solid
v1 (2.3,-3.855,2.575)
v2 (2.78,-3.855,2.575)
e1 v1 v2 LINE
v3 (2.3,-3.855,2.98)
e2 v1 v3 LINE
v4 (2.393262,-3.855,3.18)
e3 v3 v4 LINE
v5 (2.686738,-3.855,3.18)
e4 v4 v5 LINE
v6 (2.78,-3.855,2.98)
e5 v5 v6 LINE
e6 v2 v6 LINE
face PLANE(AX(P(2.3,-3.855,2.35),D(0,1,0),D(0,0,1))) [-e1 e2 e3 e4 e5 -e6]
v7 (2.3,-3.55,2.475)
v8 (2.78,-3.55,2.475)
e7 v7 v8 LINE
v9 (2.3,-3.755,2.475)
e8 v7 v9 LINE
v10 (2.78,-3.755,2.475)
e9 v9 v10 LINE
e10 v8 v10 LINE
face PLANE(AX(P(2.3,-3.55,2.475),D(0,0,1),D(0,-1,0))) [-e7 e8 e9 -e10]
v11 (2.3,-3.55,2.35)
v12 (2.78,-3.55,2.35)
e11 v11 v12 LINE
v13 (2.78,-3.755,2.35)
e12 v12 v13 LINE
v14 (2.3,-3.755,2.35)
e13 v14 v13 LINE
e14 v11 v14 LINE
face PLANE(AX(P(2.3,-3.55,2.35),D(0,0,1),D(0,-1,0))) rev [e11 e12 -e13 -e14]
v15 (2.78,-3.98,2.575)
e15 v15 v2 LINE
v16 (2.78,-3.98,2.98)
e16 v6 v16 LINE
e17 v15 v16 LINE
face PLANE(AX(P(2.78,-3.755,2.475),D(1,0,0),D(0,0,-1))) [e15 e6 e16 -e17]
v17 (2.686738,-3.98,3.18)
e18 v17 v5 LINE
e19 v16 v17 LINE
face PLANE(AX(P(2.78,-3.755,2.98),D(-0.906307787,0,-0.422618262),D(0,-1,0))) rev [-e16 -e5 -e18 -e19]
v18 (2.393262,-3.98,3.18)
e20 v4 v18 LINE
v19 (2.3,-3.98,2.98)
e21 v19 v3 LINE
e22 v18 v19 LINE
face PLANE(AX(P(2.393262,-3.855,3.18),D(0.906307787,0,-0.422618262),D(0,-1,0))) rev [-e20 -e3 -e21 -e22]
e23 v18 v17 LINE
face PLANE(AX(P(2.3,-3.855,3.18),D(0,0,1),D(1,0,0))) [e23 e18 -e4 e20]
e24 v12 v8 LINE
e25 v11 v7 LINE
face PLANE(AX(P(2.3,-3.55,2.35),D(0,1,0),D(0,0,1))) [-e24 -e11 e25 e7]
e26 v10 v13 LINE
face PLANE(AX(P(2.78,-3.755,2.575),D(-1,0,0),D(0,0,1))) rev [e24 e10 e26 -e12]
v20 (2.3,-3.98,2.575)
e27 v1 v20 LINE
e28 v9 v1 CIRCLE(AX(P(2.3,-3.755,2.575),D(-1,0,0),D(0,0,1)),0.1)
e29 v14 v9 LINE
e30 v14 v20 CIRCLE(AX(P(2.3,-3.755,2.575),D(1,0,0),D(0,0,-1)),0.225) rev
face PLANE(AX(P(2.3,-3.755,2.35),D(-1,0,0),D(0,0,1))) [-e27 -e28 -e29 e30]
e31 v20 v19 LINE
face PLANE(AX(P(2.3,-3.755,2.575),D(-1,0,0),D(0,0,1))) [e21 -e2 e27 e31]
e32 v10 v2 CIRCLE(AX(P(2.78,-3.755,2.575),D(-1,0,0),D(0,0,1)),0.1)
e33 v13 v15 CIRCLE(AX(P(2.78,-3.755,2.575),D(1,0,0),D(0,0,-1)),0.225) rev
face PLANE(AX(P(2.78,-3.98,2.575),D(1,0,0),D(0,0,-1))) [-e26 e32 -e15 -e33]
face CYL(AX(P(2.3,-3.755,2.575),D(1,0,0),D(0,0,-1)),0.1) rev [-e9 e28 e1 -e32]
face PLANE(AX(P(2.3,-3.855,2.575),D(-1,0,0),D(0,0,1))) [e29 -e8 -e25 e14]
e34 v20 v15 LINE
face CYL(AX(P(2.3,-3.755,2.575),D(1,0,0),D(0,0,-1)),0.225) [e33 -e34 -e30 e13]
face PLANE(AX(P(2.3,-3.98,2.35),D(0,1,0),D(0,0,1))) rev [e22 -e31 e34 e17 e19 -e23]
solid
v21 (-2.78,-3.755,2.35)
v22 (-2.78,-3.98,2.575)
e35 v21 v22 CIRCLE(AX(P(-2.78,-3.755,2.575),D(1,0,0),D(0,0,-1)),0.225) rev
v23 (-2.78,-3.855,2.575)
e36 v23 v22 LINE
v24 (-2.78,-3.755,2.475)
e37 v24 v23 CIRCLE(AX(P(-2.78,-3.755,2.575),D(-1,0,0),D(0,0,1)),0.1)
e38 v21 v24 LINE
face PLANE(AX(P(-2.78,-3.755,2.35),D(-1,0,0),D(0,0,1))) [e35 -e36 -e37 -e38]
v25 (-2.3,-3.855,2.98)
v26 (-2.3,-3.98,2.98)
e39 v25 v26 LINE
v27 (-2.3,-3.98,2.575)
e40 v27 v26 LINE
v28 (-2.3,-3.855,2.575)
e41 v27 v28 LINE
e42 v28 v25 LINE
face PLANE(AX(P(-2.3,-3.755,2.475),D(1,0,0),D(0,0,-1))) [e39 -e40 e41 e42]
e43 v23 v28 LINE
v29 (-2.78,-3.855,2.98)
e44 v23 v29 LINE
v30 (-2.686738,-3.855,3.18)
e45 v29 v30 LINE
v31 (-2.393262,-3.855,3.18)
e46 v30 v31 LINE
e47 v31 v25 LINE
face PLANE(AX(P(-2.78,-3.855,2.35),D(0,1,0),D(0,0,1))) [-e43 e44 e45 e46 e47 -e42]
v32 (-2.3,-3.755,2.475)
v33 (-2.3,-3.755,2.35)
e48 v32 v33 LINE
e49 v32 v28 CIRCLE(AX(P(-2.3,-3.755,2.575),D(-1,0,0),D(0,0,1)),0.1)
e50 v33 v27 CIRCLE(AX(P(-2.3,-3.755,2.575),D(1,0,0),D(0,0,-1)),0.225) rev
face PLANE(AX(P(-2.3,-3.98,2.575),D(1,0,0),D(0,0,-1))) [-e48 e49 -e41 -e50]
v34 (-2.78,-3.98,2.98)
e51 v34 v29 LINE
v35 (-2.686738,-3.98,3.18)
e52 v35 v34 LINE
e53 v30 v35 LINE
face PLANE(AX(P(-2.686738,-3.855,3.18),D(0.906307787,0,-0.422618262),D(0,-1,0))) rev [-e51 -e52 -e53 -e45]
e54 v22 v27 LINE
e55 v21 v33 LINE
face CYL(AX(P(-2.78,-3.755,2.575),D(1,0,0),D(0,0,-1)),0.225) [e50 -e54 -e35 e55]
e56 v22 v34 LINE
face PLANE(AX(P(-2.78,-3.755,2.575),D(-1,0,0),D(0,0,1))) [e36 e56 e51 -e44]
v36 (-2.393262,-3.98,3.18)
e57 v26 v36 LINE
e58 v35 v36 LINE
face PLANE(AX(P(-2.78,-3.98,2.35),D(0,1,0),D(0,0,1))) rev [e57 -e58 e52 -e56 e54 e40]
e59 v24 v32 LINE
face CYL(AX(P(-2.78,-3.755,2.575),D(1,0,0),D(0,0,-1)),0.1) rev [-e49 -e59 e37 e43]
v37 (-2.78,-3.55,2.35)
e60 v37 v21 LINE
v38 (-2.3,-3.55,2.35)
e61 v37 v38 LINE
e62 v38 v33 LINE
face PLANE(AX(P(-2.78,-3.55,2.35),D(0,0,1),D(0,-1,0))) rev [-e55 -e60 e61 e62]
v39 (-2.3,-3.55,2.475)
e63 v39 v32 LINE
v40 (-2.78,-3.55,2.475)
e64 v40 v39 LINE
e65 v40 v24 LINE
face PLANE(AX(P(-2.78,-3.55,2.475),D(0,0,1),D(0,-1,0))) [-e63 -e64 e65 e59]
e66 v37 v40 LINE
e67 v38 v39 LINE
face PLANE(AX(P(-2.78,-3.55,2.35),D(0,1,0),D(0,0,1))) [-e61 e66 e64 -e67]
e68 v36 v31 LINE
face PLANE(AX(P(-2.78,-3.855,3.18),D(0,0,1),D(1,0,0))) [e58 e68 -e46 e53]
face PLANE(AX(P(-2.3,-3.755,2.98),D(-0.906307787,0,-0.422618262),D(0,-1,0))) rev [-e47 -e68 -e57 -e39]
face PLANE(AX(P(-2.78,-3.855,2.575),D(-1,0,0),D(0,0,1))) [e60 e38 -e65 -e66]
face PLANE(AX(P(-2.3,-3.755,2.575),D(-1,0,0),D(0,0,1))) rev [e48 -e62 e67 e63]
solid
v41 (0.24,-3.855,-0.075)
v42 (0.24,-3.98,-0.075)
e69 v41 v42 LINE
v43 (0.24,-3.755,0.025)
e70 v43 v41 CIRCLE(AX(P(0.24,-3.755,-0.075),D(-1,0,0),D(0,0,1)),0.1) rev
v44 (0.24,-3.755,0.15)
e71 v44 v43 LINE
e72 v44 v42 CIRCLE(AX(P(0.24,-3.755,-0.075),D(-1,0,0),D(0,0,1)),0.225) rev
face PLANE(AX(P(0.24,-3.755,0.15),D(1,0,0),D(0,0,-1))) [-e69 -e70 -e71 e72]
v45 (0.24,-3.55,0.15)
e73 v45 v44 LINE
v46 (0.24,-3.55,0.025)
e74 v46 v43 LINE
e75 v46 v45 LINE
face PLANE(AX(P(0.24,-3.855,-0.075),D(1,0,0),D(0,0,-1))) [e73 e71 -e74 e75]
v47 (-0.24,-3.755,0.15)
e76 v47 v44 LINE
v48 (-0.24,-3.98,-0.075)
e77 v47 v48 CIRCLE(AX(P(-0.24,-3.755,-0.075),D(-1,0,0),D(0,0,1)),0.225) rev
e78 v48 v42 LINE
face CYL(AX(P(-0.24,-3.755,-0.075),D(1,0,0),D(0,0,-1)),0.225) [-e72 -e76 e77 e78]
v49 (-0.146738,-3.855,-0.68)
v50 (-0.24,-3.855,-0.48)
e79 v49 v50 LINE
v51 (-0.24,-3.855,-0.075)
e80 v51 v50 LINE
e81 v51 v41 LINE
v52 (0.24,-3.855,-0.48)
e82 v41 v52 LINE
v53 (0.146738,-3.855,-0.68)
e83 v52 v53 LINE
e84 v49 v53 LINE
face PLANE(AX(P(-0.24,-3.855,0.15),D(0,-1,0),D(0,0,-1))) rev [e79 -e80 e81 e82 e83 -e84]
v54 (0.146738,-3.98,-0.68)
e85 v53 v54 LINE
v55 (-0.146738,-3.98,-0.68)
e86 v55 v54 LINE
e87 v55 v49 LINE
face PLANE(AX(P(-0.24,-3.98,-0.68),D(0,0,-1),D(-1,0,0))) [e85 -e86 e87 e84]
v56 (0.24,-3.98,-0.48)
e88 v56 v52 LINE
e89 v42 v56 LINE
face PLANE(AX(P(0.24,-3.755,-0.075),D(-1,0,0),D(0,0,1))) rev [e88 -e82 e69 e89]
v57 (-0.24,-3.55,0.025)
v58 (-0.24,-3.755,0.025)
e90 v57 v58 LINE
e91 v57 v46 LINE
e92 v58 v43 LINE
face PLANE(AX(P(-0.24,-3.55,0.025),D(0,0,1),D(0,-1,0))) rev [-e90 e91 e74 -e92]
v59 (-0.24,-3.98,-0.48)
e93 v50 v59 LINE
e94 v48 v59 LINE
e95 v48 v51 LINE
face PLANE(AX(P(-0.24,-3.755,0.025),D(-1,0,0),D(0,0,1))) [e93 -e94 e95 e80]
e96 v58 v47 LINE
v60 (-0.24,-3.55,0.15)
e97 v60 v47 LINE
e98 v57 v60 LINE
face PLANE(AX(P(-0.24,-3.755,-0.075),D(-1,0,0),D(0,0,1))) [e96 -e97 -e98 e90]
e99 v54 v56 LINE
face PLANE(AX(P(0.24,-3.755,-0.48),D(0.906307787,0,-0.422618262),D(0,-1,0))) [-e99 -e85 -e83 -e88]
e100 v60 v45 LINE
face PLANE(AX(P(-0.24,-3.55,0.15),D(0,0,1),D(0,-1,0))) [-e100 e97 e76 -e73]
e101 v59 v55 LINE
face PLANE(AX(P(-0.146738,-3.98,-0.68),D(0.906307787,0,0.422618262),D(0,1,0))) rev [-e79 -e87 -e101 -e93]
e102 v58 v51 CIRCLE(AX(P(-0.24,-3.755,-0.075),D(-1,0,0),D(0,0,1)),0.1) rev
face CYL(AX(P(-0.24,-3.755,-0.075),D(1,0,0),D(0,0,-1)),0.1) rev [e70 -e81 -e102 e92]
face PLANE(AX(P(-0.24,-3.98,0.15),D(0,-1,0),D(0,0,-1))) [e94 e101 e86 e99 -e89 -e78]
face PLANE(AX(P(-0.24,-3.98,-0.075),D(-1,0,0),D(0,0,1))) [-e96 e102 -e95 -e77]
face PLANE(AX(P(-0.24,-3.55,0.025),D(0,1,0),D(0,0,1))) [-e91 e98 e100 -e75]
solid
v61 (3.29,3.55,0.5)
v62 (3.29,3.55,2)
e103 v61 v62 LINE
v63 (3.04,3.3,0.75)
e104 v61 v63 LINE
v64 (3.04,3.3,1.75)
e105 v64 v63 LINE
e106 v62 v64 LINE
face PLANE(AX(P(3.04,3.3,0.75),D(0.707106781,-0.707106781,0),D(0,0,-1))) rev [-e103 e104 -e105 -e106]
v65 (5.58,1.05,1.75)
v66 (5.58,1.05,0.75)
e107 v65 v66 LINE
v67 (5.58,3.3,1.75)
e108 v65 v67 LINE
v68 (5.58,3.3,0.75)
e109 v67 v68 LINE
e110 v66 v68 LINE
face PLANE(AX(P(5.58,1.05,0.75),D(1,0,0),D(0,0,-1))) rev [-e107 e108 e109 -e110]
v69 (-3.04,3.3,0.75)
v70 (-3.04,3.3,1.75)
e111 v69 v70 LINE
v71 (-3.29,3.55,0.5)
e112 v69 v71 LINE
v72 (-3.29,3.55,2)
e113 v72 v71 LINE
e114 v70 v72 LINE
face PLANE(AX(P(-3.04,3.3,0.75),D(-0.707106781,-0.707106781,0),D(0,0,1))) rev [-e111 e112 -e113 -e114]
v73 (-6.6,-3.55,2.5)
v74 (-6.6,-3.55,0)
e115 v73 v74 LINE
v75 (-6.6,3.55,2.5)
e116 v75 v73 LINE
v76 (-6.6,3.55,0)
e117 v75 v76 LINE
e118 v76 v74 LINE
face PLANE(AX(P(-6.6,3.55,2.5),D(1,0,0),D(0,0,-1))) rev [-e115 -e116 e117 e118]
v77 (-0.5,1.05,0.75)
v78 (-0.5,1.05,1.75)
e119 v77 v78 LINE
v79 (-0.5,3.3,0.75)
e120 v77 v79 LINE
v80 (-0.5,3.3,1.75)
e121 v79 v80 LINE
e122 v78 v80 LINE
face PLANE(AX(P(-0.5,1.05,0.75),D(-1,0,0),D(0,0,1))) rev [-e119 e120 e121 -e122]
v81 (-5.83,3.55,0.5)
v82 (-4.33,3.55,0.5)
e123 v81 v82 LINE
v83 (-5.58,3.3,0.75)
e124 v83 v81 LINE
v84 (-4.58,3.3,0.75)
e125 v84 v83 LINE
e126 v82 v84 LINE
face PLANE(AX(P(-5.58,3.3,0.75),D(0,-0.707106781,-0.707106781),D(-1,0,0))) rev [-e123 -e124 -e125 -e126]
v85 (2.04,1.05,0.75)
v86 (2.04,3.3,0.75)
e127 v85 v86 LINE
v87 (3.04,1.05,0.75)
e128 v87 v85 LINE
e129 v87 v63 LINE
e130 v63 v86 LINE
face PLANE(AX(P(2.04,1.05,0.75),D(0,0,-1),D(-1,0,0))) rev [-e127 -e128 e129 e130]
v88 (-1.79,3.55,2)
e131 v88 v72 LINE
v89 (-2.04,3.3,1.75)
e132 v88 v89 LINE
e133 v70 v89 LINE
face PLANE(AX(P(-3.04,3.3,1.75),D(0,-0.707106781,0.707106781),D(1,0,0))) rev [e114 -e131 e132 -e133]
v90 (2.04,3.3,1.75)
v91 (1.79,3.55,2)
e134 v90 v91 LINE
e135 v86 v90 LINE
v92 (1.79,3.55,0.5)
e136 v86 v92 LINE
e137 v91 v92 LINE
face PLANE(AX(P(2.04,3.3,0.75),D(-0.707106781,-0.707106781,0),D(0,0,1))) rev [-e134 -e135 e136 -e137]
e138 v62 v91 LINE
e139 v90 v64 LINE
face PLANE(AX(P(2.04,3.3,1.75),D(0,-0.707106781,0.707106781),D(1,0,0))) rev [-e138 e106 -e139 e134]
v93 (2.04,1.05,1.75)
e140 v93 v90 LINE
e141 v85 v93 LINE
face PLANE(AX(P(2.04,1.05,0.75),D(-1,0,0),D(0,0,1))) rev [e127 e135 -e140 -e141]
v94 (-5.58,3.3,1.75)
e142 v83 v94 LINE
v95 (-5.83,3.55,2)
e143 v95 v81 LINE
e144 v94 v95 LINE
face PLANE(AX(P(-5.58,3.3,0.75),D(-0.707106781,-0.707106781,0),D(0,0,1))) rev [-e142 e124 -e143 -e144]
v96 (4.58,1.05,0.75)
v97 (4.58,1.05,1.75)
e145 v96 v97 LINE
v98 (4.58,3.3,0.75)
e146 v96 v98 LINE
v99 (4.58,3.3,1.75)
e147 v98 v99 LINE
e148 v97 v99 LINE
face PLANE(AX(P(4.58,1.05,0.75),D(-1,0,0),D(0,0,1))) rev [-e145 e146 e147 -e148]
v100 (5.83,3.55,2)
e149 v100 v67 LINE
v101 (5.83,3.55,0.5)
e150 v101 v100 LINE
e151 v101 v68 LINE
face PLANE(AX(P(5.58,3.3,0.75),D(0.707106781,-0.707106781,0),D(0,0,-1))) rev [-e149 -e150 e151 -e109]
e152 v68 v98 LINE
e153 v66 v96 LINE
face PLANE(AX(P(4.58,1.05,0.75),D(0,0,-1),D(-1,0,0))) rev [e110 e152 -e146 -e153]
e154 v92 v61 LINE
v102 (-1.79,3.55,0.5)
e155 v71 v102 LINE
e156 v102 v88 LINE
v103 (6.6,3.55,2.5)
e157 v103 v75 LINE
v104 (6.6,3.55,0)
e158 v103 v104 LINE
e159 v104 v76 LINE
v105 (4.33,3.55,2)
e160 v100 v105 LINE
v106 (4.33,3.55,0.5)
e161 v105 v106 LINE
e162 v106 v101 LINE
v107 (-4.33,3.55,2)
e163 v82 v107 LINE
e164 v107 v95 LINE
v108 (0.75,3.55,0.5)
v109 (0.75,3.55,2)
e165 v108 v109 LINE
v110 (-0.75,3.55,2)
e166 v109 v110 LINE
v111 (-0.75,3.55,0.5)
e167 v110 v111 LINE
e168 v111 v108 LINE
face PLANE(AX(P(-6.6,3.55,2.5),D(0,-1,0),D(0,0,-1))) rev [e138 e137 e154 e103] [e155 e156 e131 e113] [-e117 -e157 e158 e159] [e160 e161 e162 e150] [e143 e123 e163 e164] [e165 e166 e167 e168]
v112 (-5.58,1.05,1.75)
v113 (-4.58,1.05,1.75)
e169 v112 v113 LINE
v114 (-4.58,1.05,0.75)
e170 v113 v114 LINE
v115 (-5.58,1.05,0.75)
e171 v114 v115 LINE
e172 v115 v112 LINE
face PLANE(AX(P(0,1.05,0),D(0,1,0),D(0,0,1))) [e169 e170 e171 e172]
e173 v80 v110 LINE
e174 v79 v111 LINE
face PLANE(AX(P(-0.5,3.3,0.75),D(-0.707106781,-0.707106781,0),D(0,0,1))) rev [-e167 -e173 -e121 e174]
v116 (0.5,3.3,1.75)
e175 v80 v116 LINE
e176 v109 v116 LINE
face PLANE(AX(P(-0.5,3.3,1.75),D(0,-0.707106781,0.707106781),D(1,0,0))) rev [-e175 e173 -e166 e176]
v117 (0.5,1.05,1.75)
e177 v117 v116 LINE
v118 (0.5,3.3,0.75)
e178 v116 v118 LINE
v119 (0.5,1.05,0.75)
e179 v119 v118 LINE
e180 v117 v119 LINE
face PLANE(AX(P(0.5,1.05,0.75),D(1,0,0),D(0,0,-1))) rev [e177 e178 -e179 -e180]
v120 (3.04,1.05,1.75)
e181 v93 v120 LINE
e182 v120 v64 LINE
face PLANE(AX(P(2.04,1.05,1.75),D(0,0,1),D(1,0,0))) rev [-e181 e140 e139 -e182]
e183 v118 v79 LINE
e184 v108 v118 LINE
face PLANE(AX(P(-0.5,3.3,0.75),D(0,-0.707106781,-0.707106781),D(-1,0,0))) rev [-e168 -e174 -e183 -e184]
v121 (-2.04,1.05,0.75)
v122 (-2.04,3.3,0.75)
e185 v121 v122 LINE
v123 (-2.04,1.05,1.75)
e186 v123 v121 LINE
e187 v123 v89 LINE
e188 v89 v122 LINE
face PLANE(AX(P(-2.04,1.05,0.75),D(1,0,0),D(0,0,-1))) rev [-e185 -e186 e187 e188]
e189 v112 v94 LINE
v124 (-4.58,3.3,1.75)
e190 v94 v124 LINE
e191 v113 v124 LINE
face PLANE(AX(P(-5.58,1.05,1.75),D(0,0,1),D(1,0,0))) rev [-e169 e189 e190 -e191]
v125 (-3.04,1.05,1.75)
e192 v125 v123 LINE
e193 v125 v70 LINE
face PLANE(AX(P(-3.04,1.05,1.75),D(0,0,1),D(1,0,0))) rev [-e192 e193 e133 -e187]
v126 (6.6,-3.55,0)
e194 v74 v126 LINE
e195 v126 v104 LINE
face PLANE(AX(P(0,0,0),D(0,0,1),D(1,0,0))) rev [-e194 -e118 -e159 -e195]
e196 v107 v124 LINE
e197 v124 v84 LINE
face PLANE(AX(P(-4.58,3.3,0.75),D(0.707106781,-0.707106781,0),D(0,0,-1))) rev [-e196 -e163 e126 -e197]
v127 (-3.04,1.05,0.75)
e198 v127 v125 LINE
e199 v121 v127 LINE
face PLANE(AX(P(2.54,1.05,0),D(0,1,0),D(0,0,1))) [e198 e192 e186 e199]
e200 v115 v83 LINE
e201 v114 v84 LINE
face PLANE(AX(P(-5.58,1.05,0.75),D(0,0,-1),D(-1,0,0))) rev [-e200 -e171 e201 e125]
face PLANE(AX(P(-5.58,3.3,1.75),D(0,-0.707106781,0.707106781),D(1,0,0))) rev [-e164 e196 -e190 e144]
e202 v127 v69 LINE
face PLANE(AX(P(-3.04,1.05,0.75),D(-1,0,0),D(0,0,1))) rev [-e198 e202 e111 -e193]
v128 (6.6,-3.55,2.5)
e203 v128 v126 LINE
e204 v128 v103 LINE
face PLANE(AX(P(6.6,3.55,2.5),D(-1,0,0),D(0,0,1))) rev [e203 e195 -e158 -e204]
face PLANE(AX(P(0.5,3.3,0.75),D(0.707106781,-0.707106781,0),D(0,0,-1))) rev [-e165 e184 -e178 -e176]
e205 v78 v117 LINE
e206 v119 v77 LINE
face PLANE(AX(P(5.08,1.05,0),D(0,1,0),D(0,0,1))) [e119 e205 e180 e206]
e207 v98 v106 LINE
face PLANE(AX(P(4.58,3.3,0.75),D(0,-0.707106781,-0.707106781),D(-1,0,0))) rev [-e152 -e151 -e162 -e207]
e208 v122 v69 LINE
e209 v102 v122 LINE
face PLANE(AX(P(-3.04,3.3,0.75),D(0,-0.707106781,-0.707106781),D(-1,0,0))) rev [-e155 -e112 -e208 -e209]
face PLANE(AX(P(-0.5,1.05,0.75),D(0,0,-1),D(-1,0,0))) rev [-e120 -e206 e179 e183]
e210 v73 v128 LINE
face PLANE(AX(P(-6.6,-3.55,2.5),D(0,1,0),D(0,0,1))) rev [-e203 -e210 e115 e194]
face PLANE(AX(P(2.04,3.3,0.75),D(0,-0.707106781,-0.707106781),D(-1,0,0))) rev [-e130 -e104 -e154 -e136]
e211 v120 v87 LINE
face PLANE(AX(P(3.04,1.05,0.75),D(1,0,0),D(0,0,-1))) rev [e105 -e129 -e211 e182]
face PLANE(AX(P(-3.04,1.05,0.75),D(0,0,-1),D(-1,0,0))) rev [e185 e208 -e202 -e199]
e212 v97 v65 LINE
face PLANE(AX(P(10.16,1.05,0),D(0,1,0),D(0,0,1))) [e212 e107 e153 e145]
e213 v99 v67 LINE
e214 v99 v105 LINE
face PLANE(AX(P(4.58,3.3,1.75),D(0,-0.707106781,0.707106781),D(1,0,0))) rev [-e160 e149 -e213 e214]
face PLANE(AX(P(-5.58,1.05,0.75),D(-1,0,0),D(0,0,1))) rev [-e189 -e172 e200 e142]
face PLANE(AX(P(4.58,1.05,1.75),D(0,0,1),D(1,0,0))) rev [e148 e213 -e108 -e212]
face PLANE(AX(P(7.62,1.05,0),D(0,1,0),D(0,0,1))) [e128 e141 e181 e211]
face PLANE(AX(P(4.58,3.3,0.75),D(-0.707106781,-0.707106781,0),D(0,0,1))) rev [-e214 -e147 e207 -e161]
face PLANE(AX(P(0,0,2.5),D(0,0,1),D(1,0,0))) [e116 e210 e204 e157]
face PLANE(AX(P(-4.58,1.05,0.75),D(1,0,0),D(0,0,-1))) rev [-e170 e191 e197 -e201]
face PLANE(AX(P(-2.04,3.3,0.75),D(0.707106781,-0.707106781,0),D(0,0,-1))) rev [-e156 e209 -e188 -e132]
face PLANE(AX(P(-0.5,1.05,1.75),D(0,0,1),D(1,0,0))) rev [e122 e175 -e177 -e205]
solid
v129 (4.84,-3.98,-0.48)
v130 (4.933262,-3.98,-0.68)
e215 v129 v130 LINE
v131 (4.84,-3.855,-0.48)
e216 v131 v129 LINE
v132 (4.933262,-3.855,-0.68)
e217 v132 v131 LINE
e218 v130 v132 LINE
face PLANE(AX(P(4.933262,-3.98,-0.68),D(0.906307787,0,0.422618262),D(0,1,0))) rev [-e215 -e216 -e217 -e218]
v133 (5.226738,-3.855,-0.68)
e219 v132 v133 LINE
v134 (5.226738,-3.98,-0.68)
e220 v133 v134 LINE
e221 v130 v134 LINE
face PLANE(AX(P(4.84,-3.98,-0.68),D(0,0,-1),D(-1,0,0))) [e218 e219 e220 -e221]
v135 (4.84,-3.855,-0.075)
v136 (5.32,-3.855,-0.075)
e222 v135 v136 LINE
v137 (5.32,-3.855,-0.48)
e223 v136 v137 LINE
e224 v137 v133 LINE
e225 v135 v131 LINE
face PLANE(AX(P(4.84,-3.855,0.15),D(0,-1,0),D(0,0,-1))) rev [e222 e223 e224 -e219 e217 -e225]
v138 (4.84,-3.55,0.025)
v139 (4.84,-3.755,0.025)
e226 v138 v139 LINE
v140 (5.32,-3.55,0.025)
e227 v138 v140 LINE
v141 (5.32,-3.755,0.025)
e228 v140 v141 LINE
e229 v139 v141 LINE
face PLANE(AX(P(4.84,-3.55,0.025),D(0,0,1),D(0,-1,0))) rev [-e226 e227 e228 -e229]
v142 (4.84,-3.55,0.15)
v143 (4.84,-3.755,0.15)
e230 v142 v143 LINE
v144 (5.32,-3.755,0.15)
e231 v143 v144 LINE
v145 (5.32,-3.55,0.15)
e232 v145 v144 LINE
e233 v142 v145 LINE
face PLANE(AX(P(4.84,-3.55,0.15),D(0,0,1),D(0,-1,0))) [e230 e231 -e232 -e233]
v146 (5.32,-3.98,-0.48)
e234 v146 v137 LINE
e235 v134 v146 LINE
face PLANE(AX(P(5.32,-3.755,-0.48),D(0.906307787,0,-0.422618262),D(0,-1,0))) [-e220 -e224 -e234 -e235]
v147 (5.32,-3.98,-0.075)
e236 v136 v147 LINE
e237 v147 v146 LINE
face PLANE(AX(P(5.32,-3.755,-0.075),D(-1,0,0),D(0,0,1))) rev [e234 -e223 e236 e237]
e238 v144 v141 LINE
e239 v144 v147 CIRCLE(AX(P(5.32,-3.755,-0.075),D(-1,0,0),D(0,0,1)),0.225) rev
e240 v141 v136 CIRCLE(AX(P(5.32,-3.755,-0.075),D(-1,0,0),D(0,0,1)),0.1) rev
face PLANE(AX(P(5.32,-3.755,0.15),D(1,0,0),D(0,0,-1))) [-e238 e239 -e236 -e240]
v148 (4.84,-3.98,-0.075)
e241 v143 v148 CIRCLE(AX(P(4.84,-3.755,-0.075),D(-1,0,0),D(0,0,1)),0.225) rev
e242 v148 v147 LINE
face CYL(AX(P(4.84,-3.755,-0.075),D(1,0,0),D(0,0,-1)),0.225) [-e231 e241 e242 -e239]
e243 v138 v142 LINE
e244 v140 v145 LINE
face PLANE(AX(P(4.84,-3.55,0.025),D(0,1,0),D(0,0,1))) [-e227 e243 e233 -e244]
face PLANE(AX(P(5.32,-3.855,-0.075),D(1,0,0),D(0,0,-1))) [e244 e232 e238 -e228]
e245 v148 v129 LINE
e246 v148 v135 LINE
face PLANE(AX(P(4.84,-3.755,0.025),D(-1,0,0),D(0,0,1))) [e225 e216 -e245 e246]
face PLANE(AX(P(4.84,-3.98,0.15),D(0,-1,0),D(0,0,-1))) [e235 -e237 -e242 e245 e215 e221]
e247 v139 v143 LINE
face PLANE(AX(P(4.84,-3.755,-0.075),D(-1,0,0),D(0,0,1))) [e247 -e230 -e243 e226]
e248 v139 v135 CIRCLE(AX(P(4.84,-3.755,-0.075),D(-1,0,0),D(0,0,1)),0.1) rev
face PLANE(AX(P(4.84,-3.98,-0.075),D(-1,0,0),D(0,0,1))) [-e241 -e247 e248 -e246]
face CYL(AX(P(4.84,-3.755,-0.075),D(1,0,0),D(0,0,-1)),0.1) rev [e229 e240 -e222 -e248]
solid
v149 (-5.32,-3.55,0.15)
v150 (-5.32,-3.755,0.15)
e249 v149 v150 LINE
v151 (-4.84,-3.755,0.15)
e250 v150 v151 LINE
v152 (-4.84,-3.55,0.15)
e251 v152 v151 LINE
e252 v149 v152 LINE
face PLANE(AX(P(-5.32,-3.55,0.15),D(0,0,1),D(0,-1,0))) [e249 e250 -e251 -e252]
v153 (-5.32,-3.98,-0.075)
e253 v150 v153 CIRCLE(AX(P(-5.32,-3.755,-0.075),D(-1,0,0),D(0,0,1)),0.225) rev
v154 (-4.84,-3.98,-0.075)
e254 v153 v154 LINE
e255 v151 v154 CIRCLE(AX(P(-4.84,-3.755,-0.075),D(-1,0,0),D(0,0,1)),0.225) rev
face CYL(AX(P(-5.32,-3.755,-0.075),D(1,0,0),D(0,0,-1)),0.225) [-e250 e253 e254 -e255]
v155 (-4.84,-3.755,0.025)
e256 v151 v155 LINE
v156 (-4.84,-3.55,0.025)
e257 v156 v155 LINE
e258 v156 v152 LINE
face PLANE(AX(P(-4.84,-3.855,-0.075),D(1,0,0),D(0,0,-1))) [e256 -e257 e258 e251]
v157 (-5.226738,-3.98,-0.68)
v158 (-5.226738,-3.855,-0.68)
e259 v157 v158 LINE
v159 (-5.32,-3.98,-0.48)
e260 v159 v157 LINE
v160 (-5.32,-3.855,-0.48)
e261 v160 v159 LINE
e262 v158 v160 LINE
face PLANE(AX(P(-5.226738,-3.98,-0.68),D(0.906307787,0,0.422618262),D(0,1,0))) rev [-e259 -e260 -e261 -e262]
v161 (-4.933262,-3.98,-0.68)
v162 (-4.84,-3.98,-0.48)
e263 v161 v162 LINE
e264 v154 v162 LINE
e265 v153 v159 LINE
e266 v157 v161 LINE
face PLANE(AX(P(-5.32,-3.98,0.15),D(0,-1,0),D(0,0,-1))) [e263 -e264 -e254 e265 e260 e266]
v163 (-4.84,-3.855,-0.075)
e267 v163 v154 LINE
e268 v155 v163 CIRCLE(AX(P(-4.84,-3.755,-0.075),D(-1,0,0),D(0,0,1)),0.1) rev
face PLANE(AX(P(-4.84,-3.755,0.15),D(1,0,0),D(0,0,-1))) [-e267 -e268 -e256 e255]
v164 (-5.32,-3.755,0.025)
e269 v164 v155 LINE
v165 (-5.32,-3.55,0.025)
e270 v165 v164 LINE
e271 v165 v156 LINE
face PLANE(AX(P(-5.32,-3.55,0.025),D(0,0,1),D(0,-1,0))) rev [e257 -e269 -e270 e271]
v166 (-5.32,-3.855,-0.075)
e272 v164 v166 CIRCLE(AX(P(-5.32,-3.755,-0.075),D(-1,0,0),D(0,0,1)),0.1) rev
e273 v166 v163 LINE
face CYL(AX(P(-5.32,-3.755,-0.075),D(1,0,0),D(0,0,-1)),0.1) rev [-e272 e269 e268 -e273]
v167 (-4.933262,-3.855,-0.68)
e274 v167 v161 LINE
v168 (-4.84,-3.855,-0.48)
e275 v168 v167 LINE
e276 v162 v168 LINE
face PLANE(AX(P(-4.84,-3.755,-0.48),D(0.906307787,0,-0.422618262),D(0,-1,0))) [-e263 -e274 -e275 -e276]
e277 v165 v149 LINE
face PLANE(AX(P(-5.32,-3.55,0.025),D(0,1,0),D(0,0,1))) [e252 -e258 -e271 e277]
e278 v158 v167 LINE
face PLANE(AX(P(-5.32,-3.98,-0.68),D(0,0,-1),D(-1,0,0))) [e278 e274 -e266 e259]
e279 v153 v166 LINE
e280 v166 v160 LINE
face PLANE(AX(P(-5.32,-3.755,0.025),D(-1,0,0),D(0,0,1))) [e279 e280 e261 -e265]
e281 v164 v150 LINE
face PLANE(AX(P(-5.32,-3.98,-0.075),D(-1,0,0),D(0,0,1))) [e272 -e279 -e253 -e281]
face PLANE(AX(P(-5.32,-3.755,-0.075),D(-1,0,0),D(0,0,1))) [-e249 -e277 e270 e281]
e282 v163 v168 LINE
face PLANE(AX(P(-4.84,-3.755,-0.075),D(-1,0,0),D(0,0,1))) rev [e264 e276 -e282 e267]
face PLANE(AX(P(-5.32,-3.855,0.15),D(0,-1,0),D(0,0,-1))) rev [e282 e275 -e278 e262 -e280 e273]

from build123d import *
from OCP.BRepFilletAPI import BRepFilletAPI_MakeChamfer

# Parameters (mm, degrees)
SKETCH1_W                  = 13.2
SKETCH1_H                  = 7.1
BOSS_EXTRUDE1_DEPTH        = 2.5
SKETCH2_W                  = 1
SKETCH2_H                  = 1
CUT_EXTRUDE1_DEPTH         = 2.5
CHAMFER1_SIZE              = 0.25
LPATTERN6_COUNT            = 5
LPATTERN6_PITCH            = 2.54
CHAMFER1_OF_LPATTERN6_SIZE = 0.25
BASE_FLANGE2_DEPTH         = 0.24
BASE_FLANGE2_DEPTH_BACK    = 0.24
BASE_FLANGE3_DEPTH         = 0.24
BASE_FLANGE3_DEPTH_BACK    = 0.24
CHAMFER3_SIZE              = 0.2
CHAMFER3_SIZE2             = 0.093261532
CHAMFER4_SIZE              = 0.2
CHAMFER4_SIZE2             = 0.093261532
LPATTERN4_COUNT            = 3
LPATTERN4_PITCH            = 5.08
LPATTERN3_COUNT            = 2
LPATTERN3_PITCH            = 5.08


# Sheet-metal steps are written as plain solids
with BuildPart() as part:
    # Sketch1 → Boss-Extrude1 (new body)
    with BuildSketch(Plane.XY):
        Rectangle(SKETCH1_W, SKETCH1_H)
    extrude(amount=BOSS_EXTRUDE1_DEPTH)

    # Sketch2 → Cut-Extrude1 (cut)
    with BuildSketch(Plane(origin=(0, 3.55, 0), x_dir=(1, 0, 0), z_dir=(0, 1, 0))):
        with Locations((-5.08, -1.25)):
            Rectangle(SKETCH2_W, SKETCH2_H)
    cut_extrude1 = extrude(amount=-CUT_EXTRUDE1_DEPTH, mode=Mode.SUBTRACT)

    # Chamfer1
    chamfer1_edges = [part.edges().sort_by_distance(p)[0] for p in [
        (-4.58, 3.55, 1.25),
        (-5.08, 3.55, 0.75),
        (-5.58, 3.55, 1.25),
        (-5.08, 3.55, 1.75),
    ]]
    chamfer(chamfer1_edges, length=CHAMFER1_SIZE)

    # LPattern6: Cut-Extrude1 ×5
    with Locations(*[(i * LPATTERN6_PITCH, 0, 0) for i in range(1, LPATTERN6_COUNT)]):
        add(cut_extrude1, mode=Mode.SUBTRACT)

    # Chamfer1 of LPattern6
    chamfer1_of_lpattern6_edges = [part.edges().sort_by_distance(p)[0] for p in [
        (-2.04, 3.55, 1.25),
        (-2.54, 3.55, 0.75),
        (-3.04, 3.55, 1.25),
        (-2.54, 3.55, 1.75),
        (0.5, 3.55, 1.25),
        (0, 3.55, 0.75),
        (-0.5, 3.55, 1.25),
        (0, 3.55, 1.75),
        (3.04, 3.55, 1.25),
        (2.54, 3.55, 0.75),
        (2.04, 3.55, 1.25),
        (2.54, 3.55, 1.75),
        (5.58, 3.55, 1.25),
        (5.08, 3.55, 0.75),
        (4.58, 3.55, 1.25),
        (5.08, 3.55, 1.75),
    ]]
    chamfer(chamfer1_of_lpattern6_edges, length=CHAMFER1_OF_LPATTERN6_SIZE)


with BuildPart() as body_2:
    # Sketch5 → Base-Flange2 (new, two sides: drawn at the far end of the back side and taken through both)
    with BuildSketch(Plane.ZY.offset(5.08).offset(-BASE_FLANGE2_DEPTH_BACK)):
        with BuildLine():
            Line((0.15, -3.55), (0.15, -3.755))
            ThreePointArc((0.15, -3.755), (0.084099026, -3.914099026), (-0.075, -3.98))
            Line((-0.075, -3.98), (-0.68, -3.98))
            Line((-0.68, -3.98), (-0.68, -3.855))
            Line((-0.68, -3.855), (-0.075, -3.855))
            ThreePointArc((-0.075, -3.855), (-0.004289322, -3.825710678), (0.025, -3.755))
            Line((0.025, -3.755), (0.025, -3.55))
            Line((0.025, -3.55), (0.15, -3.55))
        make_face()
    extrude(amount=BASE_FLANGE2_DEPTH + BASE_FLANGE2_DEPTH_BACK)

    # Chamfer4: one chamfer whose edges measure the first distance from different faces: ONE call of the kernel's chamfer builder (chamfer() names one face for all edges)
    chamfer4_edges_1 = [body_2.edges().sort_by_distance(p)[0] for p in [
        (-4.84, -3.9175, -0.68),
    ]]
    chamfer4_side_1 = [body_2.faces().sort_by_distance(p)[0] for p in [
        (-4.84, -3.6525, 0.034347727),
    ]]
    chamfer4_edges_2 = [body_2.edges().sort_by_distance(p)[0] for p in [
        (-5.32, -3.9175, -0.68),
    ]]
    chamfer4_side_2 = [body_2.faces().sort_by_distance(p)[0] for p in [
        (-5.32, -3.6525, 0.034347727),
    ]]
    chamfer4 = BRepFilletAPI_MakeChamfer(body_2.part.solid().wrapped)
    for e in chamfer4_edges_1:
        chamfer4.Add(CHAMFER4_SIZE, CHAMFER4_SIZE2, e.wrapped, chamfer4_side_1[0].wrapped)  # the first distance lies on this face
    for e in chamfer4_edges_2:
        chamfer4.Add(CHAMFER4_SIZE, CHAMFER4_SIZE2, e.wrapped, chamfer4_side_2[0].wrapped)  # the first distance lies on this face
    add(Compound.cast(chamfer4.Shape()), mode=Mode.REPLACE)


with BuildPart() as body_3:
    # Sketch22 → Base-Flange3 (new, two sides: drawn at the far end of the back side and taken through both)
    with BuildSketch(Plane.ZY.offset(2.54).offset(-BASE_FLANGE3_DEPTH_BACK)):
        with BuildLine():
            Line((2.35, -3.55), (2.35, -3.755))
            ThreePointArc((2.35, -3.755), (2.415900974, -3.914099026), (2.575, -3.98))
            Line((2.575, -3.98), (3.18, -3.98))
            Line((3.18, -3.98), (3.18, -3.855))
            Line((3.18, -3.855), (2.575, -3.855))
            ThreePointArc((2.575, -3.855), (2.504289322, -3.825710678), (2.475, -3.755))
            Line((2.475, -3.755), (2.475, -3.55))
            Line((2.475, -3.55), (2.35, -3.55))
        make_face()
    extrude(amount=BASE_FLANGE3_DEPTH + BASE_FLANGE3_DEPTH_BACK)

    # Chamfer3: one chamfer whose edges measure the first distance from different faces: ONE call of the kernel's chamfer builder (chamfer() names one face for all edges)
    chamfer3_edges_1 = [body_3.edges().sort_by_distance(p)[0] for p in [
        (-2.3, -3.9175, 3.18),
    ]]
    chamfer3_side_1 = [body_3.faces().sort_by_distance(p)[0] for p in [
        (-2.3, -3.6525, 2.465652273),
    ]]
    chamfer3_edges_2 = [body_3.edges().sort_by_distance(p)[0] for p in [
        (-2.78, -3.9175, 3.18),
    ]]
    chamfer3_side_2 = [body_3.faces().sort_by_distance(p)[0] for p in [
        (-2.78, -3.6525, 2.465652273),
    ]]
    chamfer3 = BRepFilletAPI_MakeChamfer(body_3.part.solid().wrapped)
    for e in chamfer3_edges_1:
        chamfer3.Add(CHAMFER3_SIZE, CHAMFER3_SIZE2, e.wrapped, chamfer3_side_1[0].wrapped)  # the first distance lies on this face
    for e in chamfer3_edges_2:
        chamfer3.Add(CHAMFER3_SIZE, CHAMFER3_SIZE2, e.wrapped, chamfer3_side_2[0].wrapped)  # the first distance lies on this face
    add(Compound.cast(chamfer3.Shape()), mode=Mode.REPLACE)


with BuildPart() as lpattern4_1:
    # LPattern4: pattern copy
    add(body_2.part.moved(Location(Vector(1, 0, 0) * (1 * LPATTERN4_PITCH))))


with BuildPart() as lpattern4_2:
    # LPattern4: pattern copy
    add(body_2.part.moved(Location(Vector(1, 0, 0) * (2 * LPATTERN4_PITCH))))


with BuildPart() as lpattern3_1:
    # LPattern3: pattern copy
    add(body_3.part.moved(Location(Vector(1, 0, 0) * (1 * LPATTERN3_PITCH))))


solid = Compound([part.part, body_2.part, body_3.part, lpattern4_1.part, lpattern4_2.part, lpattern3_1.part])
